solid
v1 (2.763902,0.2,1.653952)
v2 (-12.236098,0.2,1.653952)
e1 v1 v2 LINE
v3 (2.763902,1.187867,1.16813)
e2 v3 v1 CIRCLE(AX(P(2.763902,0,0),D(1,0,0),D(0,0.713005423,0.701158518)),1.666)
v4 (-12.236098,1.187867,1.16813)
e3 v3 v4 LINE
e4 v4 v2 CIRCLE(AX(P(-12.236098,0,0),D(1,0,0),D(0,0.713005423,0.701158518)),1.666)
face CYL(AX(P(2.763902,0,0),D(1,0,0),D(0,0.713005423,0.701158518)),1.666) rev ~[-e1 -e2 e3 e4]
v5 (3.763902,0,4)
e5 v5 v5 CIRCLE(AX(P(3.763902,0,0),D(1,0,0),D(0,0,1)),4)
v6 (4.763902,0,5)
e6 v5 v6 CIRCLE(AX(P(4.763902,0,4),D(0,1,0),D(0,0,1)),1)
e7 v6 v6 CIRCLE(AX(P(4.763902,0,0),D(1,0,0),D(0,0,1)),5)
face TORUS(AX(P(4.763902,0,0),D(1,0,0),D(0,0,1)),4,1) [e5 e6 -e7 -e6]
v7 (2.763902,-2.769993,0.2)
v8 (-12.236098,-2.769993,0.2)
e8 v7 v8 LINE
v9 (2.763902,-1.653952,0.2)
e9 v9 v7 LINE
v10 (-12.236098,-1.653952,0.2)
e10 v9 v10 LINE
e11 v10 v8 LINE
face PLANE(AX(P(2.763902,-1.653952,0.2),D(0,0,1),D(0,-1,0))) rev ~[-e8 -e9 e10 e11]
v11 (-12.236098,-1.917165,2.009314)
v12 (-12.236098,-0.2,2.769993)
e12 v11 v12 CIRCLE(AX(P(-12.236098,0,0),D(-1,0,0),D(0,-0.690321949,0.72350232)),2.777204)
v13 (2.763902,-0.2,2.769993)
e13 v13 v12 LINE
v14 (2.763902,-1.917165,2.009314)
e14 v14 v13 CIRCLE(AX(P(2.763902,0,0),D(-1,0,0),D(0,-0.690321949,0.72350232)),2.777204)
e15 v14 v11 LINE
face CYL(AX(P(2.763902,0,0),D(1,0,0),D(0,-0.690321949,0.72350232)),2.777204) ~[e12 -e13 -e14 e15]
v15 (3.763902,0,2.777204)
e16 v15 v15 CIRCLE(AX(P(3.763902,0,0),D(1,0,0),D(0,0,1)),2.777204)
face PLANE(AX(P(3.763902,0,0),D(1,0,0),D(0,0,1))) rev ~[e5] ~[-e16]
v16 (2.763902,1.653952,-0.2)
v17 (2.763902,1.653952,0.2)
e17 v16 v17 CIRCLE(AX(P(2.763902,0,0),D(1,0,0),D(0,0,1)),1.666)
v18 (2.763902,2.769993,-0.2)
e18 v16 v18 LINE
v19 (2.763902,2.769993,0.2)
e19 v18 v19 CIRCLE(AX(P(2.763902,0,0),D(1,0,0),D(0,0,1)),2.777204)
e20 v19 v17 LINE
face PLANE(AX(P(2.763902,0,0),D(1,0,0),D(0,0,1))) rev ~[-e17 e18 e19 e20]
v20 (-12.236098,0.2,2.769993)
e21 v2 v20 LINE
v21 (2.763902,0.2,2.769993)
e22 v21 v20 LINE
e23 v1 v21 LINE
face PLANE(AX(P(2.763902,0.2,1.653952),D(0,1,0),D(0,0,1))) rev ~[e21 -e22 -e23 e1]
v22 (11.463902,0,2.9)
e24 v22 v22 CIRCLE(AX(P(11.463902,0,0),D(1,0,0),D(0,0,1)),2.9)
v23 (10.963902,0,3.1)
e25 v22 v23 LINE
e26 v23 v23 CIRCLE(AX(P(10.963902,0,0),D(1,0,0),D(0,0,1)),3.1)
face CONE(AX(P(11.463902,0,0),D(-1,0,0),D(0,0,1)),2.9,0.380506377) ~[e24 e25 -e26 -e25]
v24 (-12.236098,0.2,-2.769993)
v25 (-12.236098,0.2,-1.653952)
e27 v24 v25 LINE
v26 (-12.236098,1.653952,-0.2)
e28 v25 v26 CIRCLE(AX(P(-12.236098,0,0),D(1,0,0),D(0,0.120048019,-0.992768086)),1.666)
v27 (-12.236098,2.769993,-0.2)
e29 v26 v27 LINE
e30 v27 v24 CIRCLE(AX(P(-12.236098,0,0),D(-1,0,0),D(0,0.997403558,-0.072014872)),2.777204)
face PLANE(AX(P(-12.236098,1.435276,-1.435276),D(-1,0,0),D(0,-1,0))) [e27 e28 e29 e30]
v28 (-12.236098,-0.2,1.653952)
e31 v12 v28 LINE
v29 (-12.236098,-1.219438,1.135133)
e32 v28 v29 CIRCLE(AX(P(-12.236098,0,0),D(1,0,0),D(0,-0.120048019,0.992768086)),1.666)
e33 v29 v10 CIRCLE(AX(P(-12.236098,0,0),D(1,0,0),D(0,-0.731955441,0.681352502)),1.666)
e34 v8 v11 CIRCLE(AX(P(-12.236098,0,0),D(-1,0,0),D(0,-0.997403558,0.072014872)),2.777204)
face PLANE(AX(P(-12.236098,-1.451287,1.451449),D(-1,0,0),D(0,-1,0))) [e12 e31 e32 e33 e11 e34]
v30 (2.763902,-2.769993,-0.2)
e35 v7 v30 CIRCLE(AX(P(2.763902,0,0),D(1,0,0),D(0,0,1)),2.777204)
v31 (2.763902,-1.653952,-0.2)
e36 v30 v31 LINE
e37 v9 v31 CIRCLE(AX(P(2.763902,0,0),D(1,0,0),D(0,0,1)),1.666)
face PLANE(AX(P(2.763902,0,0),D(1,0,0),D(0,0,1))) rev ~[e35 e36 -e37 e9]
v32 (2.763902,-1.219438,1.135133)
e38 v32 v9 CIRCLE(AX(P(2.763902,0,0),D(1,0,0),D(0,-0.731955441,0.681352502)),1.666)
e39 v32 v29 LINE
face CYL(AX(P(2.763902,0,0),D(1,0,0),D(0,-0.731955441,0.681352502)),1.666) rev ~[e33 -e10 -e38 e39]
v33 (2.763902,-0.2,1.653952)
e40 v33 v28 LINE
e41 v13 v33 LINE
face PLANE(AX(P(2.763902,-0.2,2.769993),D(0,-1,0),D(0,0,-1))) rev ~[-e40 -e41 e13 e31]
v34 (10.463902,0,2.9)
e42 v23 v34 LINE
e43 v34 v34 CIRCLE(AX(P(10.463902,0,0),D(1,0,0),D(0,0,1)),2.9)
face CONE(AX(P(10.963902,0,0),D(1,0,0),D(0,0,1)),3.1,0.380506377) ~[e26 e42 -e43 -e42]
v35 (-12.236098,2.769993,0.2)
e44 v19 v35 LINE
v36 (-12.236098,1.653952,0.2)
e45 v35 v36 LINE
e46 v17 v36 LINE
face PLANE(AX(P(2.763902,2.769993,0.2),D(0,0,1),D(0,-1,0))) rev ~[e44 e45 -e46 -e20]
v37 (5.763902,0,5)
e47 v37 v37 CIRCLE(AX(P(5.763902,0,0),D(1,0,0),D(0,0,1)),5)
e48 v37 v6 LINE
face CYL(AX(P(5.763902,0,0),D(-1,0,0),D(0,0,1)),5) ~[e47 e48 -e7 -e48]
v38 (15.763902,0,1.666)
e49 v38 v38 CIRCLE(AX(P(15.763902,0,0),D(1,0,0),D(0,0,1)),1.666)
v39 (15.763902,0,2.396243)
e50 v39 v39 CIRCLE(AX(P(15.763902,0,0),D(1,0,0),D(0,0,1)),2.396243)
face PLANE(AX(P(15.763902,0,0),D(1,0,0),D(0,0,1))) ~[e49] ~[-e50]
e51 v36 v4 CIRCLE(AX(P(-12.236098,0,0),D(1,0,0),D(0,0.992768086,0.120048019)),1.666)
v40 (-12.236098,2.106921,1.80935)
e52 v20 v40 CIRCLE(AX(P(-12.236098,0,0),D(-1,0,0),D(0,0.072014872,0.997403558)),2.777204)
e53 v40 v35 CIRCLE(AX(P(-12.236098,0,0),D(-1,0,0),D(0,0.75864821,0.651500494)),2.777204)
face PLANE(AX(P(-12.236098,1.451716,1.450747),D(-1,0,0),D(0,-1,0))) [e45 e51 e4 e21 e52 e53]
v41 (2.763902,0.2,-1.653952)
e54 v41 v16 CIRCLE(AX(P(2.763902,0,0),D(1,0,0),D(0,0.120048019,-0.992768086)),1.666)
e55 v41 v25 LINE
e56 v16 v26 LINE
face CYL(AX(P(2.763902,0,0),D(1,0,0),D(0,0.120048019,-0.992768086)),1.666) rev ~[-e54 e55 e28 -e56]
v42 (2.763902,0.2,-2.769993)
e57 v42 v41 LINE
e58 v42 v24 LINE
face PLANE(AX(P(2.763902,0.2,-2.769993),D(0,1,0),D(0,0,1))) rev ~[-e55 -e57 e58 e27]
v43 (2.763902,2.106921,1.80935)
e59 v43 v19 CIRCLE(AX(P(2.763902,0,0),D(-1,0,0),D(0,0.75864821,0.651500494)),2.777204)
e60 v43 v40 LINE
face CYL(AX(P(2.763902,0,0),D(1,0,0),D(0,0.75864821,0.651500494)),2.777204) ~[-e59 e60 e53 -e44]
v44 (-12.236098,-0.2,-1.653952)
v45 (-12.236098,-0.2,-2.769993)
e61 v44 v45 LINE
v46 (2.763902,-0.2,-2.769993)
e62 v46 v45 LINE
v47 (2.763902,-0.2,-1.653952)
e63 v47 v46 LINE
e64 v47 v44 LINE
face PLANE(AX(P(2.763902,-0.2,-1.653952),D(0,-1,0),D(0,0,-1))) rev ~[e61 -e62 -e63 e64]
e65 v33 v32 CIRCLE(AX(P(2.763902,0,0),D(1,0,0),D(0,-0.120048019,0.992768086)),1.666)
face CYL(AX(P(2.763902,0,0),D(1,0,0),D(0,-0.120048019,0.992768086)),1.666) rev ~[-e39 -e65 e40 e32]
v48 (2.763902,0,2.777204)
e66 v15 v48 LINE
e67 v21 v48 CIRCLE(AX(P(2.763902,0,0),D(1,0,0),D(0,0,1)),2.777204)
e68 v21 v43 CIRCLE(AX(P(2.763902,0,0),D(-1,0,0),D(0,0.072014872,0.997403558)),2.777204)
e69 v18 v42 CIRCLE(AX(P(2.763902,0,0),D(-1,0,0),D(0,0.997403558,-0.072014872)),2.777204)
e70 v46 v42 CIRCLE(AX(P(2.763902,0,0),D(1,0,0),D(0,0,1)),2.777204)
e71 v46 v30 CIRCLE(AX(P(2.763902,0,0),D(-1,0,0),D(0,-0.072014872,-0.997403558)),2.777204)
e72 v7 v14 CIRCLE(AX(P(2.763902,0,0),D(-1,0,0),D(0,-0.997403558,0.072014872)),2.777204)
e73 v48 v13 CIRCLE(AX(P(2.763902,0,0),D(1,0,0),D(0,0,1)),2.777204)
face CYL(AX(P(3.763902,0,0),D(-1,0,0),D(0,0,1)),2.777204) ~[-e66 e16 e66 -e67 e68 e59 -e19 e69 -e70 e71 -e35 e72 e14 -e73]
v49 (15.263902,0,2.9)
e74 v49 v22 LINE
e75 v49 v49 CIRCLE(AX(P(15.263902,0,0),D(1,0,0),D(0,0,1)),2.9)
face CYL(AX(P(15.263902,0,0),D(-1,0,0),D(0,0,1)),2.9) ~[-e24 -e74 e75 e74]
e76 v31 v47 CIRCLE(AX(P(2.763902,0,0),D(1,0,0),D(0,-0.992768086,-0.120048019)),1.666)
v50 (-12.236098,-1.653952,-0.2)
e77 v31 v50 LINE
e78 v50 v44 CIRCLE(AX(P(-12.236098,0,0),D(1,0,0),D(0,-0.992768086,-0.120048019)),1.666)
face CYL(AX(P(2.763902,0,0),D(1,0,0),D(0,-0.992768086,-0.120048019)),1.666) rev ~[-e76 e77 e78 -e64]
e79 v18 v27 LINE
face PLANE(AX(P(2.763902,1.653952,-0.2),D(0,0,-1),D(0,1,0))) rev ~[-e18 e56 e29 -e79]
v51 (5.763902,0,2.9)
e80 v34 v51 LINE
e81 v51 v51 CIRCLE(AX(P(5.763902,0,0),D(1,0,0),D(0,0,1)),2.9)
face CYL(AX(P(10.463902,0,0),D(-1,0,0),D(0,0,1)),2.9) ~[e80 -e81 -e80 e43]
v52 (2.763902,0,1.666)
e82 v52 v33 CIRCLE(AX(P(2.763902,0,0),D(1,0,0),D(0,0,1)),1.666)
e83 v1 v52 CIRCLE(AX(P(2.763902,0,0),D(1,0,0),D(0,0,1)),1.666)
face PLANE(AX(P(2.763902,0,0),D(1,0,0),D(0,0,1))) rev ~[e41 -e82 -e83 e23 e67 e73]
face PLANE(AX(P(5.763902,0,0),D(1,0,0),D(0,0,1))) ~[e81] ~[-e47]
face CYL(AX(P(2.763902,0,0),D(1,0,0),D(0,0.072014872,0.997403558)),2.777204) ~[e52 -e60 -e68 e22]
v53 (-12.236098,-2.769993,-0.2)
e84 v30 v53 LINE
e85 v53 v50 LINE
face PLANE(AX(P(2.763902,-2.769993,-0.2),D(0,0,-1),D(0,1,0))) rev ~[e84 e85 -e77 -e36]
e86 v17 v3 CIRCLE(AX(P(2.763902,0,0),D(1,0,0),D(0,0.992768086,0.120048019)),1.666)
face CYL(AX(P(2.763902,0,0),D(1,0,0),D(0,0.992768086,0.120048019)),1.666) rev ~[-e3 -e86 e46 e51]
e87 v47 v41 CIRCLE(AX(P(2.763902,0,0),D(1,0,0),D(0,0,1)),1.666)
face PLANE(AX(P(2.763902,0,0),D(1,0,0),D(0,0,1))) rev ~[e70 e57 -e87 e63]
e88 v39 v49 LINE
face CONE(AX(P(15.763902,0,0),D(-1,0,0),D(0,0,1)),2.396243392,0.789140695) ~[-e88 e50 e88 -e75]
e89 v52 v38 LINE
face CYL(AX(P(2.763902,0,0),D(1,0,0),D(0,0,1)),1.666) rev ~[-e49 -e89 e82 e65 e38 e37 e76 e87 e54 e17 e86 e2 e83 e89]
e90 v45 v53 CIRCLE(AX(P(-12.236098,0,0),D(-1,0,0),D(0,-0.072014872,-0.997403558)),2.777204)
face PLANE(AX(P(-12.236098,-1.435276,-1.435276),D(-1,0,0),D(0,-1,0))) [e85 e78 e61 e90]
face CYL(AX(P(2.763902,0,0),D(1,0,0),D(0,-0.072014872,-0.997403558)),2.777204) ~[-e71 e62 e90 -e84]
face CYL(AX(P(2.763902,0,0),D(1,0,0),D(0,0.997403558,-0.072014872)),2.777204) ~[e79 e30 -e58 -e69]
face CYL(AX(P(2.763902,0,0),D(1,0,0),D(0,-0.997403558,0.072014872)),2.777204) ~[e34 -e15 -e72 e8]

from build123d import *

# Parameters (mm, degrees)
F3_DEPTH = 15
F4_DEPTH = 15
F5_DEPTH = 15
F7_R     = 1


# Not quite as in the source:
# - after a boolean that leaves OpenCascade's solid faulty, fix() repairs it
# - a feature of the source that left no trace in its solid (it failed there, or was rolled back) is left out


with BuildPart() as f1:
    # F0 (on Front) → F1 (revolve)
    with BuildSketch(Plane.XZ):
        Polygon((2.7639019594, 2.7772041211), (2.7639019594, 1.666), (15.7639019594, 1.666), (15.7639019594, 2.3962433916), (15.2639019594, 2.9), (11.4639019594, 2.9), (10.9639019594, 3.1), (10.4639019594, 2.9), (5.7639019594, 2.9), (5.7639019594, 5), (3.7639019594, 5), (3.7639019594, 2.7772041211), align=None)
    revolve(axis=Axis((8.0730360566, 0, 0), (1, 0, 0)))

    # F2 (on face) → F3 (join)
    with BuildSketch(Plane(origin=(2.7639019594, 0, 0), x_dir=(0, -1, 0), z_dir=(-1, 0, 0))):
        with BuildLine():
            ThreePointArc((-1.1878670343, 1.1681300907), (-0.7352206258, 1.4949938566), (-0.2, 1.6539516317))
            Line((-0.2, 1.6539516317), (-0.2, 2.7699932726))
            ThreePointArc((-0.2, 2.7699932726), (-1.249471885, 2.4802586032), (-2.1069209339, 1.8093498579))
            ThreePointArc((-2.1069209339, 1.8093498579), (-2.5677957056, 1.0579640563), (-2.7699932726, 0.2))
            Line((-2.7699932726, 0.2), (-1.6539516317, 0.2))
            ThreePointArc((-1.6539516317, 0.2), (-1.5011003633, 0.7226712249), (-1.1878670343, 1.1681300907))
        make_face()
    extrude(amount=F3_DEPTH)

    # F2 (on face) → F4 (join)
    with BuildSketch(Plane(origin=(2.7639019594, 0, 0), x_dir=(0, -1, 0), z_dir=(-1, 0, 0))):
        with BuildLine():
            Line((0.2, 2.7699932726), (0.2, 1.6539516317))
            ThreePointArc((0.2, 1.6539516317), (0.75564146, 1.4847767455), (1.2194377654, 1.1351332681))
            ThreePointArc((1.2194377654, 1.1351332681), (1.5108640621, 0.7020297614), (1.6539516317, 0.2))
            Line((1.6539516317, 0.2), (2.7699932726, 0.2))
            ThreePointArc((2.7699932726, 0.2), (2.5121240066, 1.1841012226), (1.917164961, 2.0093136247))
            ThreePointArc((1.917164961, 2.0093136247), (1.1248356545, 2.5392139493), (0.2, 2.7699932726))
        make_face()
    extrude(amount=F4_DEPTH)

    # F2 (on face) → F5 (join)
    with BuildSketch(Plane(origin=(2.7639019594, 0, 0), x_dir=(0, -1, 0), z_dir=(-1, 0, 0))):
        with BuildLine():
            ThreePointArc((-1.1878670343, 1.1681300907), (-0.7352206258, 1.4949938566), (-0.2, 1.6539516317))
            Line((-0.2, 1.6539516317), (-0.2, 2.7699932726))
            ThreePointArc((-0.2, 2.7699932726), (-1.249471885, 2.4802586032), (-2.1069209339, 1.8093498579))
            ThreePointArc((-2.1069209339, 1.8093498579), (-2.5677957056, 1.0579640563), (-2.7699932726, 0.2))
            Line((-2.7699932726, 0.2), (-1.6539516317, 0.2))
            ThreePointArc((-1.6539516317, 0.2), (-1.5011003633, 0.7226712249), (-1.1878670343, 1.1681300907))
        make_face()
        with BuildLine():
            Line((0.2, 2.7699932726), (0.2, 1.6539516317))
            ThreePointArc((0.2, 1.6539516317), (0.75564146, 1.4847767455), (1.2194377654, 1.1351332681))
            ThreePointArc((1.2194377654, 1.1351332681), (1.5108640621, 0.7020297614), (1.6539516317, 0.2))
            Line((1.6539516317, 0.2), (2.7699932726, 0.2))
            ThreePointArc((2.7699932726, 0.2), (2.5121240066, 1.1841012226), (1.917164961, 2.0093136247))
            ThreePointArc((1.917164961, 2.0093136247), (1.1248356545, 2.5392139493), (0.2, 2.7699932726))
        make_face()
        with BuildLine():
            ThreePointArc((-0.2, -1.6539516317), (-1.1780398975, -1.1780398975), (-1.6539516317, -0.2))
            Line((-1.6539516317, -0.2), (-2.7699932726, -0.2))
            ThreePointArc((-2.7699932726, -0.2), (-1.9637798667, -1.9637798667), (-0.2, -2.7699932726))
            Line((-0.2, -2.7699932726), (-0.2, -1.6539516317))
        make_face()
        with BuildLine():
            Line((2.7699932726, -0.2), (1.6539516317, -0.2))
            ThreePointArc((1.6539516317, -0.2), (1.1780398975, -1.1780398975), (0.2, -1.6539516317))
            Line((0.2, -1.6539516317), (0.2, -2.7699932726))
            ThreePointArc((0.2, -2.7699932726), (1.9637798667, -1.9637798667), (2.7699932726, -0.2))
        make_face()
    extrude(amount=F5_DEPTH)

    add(f1.part.fix(), mode=Mode.REPLACE)

    # F7
    f7_edges = [f1.edges().sort_by_distance(p)[0] for p in [
        (3.763902, 0, -5),
    ]]
    fillet(f7_edges, radius=F7_R)


solid = f1.part
